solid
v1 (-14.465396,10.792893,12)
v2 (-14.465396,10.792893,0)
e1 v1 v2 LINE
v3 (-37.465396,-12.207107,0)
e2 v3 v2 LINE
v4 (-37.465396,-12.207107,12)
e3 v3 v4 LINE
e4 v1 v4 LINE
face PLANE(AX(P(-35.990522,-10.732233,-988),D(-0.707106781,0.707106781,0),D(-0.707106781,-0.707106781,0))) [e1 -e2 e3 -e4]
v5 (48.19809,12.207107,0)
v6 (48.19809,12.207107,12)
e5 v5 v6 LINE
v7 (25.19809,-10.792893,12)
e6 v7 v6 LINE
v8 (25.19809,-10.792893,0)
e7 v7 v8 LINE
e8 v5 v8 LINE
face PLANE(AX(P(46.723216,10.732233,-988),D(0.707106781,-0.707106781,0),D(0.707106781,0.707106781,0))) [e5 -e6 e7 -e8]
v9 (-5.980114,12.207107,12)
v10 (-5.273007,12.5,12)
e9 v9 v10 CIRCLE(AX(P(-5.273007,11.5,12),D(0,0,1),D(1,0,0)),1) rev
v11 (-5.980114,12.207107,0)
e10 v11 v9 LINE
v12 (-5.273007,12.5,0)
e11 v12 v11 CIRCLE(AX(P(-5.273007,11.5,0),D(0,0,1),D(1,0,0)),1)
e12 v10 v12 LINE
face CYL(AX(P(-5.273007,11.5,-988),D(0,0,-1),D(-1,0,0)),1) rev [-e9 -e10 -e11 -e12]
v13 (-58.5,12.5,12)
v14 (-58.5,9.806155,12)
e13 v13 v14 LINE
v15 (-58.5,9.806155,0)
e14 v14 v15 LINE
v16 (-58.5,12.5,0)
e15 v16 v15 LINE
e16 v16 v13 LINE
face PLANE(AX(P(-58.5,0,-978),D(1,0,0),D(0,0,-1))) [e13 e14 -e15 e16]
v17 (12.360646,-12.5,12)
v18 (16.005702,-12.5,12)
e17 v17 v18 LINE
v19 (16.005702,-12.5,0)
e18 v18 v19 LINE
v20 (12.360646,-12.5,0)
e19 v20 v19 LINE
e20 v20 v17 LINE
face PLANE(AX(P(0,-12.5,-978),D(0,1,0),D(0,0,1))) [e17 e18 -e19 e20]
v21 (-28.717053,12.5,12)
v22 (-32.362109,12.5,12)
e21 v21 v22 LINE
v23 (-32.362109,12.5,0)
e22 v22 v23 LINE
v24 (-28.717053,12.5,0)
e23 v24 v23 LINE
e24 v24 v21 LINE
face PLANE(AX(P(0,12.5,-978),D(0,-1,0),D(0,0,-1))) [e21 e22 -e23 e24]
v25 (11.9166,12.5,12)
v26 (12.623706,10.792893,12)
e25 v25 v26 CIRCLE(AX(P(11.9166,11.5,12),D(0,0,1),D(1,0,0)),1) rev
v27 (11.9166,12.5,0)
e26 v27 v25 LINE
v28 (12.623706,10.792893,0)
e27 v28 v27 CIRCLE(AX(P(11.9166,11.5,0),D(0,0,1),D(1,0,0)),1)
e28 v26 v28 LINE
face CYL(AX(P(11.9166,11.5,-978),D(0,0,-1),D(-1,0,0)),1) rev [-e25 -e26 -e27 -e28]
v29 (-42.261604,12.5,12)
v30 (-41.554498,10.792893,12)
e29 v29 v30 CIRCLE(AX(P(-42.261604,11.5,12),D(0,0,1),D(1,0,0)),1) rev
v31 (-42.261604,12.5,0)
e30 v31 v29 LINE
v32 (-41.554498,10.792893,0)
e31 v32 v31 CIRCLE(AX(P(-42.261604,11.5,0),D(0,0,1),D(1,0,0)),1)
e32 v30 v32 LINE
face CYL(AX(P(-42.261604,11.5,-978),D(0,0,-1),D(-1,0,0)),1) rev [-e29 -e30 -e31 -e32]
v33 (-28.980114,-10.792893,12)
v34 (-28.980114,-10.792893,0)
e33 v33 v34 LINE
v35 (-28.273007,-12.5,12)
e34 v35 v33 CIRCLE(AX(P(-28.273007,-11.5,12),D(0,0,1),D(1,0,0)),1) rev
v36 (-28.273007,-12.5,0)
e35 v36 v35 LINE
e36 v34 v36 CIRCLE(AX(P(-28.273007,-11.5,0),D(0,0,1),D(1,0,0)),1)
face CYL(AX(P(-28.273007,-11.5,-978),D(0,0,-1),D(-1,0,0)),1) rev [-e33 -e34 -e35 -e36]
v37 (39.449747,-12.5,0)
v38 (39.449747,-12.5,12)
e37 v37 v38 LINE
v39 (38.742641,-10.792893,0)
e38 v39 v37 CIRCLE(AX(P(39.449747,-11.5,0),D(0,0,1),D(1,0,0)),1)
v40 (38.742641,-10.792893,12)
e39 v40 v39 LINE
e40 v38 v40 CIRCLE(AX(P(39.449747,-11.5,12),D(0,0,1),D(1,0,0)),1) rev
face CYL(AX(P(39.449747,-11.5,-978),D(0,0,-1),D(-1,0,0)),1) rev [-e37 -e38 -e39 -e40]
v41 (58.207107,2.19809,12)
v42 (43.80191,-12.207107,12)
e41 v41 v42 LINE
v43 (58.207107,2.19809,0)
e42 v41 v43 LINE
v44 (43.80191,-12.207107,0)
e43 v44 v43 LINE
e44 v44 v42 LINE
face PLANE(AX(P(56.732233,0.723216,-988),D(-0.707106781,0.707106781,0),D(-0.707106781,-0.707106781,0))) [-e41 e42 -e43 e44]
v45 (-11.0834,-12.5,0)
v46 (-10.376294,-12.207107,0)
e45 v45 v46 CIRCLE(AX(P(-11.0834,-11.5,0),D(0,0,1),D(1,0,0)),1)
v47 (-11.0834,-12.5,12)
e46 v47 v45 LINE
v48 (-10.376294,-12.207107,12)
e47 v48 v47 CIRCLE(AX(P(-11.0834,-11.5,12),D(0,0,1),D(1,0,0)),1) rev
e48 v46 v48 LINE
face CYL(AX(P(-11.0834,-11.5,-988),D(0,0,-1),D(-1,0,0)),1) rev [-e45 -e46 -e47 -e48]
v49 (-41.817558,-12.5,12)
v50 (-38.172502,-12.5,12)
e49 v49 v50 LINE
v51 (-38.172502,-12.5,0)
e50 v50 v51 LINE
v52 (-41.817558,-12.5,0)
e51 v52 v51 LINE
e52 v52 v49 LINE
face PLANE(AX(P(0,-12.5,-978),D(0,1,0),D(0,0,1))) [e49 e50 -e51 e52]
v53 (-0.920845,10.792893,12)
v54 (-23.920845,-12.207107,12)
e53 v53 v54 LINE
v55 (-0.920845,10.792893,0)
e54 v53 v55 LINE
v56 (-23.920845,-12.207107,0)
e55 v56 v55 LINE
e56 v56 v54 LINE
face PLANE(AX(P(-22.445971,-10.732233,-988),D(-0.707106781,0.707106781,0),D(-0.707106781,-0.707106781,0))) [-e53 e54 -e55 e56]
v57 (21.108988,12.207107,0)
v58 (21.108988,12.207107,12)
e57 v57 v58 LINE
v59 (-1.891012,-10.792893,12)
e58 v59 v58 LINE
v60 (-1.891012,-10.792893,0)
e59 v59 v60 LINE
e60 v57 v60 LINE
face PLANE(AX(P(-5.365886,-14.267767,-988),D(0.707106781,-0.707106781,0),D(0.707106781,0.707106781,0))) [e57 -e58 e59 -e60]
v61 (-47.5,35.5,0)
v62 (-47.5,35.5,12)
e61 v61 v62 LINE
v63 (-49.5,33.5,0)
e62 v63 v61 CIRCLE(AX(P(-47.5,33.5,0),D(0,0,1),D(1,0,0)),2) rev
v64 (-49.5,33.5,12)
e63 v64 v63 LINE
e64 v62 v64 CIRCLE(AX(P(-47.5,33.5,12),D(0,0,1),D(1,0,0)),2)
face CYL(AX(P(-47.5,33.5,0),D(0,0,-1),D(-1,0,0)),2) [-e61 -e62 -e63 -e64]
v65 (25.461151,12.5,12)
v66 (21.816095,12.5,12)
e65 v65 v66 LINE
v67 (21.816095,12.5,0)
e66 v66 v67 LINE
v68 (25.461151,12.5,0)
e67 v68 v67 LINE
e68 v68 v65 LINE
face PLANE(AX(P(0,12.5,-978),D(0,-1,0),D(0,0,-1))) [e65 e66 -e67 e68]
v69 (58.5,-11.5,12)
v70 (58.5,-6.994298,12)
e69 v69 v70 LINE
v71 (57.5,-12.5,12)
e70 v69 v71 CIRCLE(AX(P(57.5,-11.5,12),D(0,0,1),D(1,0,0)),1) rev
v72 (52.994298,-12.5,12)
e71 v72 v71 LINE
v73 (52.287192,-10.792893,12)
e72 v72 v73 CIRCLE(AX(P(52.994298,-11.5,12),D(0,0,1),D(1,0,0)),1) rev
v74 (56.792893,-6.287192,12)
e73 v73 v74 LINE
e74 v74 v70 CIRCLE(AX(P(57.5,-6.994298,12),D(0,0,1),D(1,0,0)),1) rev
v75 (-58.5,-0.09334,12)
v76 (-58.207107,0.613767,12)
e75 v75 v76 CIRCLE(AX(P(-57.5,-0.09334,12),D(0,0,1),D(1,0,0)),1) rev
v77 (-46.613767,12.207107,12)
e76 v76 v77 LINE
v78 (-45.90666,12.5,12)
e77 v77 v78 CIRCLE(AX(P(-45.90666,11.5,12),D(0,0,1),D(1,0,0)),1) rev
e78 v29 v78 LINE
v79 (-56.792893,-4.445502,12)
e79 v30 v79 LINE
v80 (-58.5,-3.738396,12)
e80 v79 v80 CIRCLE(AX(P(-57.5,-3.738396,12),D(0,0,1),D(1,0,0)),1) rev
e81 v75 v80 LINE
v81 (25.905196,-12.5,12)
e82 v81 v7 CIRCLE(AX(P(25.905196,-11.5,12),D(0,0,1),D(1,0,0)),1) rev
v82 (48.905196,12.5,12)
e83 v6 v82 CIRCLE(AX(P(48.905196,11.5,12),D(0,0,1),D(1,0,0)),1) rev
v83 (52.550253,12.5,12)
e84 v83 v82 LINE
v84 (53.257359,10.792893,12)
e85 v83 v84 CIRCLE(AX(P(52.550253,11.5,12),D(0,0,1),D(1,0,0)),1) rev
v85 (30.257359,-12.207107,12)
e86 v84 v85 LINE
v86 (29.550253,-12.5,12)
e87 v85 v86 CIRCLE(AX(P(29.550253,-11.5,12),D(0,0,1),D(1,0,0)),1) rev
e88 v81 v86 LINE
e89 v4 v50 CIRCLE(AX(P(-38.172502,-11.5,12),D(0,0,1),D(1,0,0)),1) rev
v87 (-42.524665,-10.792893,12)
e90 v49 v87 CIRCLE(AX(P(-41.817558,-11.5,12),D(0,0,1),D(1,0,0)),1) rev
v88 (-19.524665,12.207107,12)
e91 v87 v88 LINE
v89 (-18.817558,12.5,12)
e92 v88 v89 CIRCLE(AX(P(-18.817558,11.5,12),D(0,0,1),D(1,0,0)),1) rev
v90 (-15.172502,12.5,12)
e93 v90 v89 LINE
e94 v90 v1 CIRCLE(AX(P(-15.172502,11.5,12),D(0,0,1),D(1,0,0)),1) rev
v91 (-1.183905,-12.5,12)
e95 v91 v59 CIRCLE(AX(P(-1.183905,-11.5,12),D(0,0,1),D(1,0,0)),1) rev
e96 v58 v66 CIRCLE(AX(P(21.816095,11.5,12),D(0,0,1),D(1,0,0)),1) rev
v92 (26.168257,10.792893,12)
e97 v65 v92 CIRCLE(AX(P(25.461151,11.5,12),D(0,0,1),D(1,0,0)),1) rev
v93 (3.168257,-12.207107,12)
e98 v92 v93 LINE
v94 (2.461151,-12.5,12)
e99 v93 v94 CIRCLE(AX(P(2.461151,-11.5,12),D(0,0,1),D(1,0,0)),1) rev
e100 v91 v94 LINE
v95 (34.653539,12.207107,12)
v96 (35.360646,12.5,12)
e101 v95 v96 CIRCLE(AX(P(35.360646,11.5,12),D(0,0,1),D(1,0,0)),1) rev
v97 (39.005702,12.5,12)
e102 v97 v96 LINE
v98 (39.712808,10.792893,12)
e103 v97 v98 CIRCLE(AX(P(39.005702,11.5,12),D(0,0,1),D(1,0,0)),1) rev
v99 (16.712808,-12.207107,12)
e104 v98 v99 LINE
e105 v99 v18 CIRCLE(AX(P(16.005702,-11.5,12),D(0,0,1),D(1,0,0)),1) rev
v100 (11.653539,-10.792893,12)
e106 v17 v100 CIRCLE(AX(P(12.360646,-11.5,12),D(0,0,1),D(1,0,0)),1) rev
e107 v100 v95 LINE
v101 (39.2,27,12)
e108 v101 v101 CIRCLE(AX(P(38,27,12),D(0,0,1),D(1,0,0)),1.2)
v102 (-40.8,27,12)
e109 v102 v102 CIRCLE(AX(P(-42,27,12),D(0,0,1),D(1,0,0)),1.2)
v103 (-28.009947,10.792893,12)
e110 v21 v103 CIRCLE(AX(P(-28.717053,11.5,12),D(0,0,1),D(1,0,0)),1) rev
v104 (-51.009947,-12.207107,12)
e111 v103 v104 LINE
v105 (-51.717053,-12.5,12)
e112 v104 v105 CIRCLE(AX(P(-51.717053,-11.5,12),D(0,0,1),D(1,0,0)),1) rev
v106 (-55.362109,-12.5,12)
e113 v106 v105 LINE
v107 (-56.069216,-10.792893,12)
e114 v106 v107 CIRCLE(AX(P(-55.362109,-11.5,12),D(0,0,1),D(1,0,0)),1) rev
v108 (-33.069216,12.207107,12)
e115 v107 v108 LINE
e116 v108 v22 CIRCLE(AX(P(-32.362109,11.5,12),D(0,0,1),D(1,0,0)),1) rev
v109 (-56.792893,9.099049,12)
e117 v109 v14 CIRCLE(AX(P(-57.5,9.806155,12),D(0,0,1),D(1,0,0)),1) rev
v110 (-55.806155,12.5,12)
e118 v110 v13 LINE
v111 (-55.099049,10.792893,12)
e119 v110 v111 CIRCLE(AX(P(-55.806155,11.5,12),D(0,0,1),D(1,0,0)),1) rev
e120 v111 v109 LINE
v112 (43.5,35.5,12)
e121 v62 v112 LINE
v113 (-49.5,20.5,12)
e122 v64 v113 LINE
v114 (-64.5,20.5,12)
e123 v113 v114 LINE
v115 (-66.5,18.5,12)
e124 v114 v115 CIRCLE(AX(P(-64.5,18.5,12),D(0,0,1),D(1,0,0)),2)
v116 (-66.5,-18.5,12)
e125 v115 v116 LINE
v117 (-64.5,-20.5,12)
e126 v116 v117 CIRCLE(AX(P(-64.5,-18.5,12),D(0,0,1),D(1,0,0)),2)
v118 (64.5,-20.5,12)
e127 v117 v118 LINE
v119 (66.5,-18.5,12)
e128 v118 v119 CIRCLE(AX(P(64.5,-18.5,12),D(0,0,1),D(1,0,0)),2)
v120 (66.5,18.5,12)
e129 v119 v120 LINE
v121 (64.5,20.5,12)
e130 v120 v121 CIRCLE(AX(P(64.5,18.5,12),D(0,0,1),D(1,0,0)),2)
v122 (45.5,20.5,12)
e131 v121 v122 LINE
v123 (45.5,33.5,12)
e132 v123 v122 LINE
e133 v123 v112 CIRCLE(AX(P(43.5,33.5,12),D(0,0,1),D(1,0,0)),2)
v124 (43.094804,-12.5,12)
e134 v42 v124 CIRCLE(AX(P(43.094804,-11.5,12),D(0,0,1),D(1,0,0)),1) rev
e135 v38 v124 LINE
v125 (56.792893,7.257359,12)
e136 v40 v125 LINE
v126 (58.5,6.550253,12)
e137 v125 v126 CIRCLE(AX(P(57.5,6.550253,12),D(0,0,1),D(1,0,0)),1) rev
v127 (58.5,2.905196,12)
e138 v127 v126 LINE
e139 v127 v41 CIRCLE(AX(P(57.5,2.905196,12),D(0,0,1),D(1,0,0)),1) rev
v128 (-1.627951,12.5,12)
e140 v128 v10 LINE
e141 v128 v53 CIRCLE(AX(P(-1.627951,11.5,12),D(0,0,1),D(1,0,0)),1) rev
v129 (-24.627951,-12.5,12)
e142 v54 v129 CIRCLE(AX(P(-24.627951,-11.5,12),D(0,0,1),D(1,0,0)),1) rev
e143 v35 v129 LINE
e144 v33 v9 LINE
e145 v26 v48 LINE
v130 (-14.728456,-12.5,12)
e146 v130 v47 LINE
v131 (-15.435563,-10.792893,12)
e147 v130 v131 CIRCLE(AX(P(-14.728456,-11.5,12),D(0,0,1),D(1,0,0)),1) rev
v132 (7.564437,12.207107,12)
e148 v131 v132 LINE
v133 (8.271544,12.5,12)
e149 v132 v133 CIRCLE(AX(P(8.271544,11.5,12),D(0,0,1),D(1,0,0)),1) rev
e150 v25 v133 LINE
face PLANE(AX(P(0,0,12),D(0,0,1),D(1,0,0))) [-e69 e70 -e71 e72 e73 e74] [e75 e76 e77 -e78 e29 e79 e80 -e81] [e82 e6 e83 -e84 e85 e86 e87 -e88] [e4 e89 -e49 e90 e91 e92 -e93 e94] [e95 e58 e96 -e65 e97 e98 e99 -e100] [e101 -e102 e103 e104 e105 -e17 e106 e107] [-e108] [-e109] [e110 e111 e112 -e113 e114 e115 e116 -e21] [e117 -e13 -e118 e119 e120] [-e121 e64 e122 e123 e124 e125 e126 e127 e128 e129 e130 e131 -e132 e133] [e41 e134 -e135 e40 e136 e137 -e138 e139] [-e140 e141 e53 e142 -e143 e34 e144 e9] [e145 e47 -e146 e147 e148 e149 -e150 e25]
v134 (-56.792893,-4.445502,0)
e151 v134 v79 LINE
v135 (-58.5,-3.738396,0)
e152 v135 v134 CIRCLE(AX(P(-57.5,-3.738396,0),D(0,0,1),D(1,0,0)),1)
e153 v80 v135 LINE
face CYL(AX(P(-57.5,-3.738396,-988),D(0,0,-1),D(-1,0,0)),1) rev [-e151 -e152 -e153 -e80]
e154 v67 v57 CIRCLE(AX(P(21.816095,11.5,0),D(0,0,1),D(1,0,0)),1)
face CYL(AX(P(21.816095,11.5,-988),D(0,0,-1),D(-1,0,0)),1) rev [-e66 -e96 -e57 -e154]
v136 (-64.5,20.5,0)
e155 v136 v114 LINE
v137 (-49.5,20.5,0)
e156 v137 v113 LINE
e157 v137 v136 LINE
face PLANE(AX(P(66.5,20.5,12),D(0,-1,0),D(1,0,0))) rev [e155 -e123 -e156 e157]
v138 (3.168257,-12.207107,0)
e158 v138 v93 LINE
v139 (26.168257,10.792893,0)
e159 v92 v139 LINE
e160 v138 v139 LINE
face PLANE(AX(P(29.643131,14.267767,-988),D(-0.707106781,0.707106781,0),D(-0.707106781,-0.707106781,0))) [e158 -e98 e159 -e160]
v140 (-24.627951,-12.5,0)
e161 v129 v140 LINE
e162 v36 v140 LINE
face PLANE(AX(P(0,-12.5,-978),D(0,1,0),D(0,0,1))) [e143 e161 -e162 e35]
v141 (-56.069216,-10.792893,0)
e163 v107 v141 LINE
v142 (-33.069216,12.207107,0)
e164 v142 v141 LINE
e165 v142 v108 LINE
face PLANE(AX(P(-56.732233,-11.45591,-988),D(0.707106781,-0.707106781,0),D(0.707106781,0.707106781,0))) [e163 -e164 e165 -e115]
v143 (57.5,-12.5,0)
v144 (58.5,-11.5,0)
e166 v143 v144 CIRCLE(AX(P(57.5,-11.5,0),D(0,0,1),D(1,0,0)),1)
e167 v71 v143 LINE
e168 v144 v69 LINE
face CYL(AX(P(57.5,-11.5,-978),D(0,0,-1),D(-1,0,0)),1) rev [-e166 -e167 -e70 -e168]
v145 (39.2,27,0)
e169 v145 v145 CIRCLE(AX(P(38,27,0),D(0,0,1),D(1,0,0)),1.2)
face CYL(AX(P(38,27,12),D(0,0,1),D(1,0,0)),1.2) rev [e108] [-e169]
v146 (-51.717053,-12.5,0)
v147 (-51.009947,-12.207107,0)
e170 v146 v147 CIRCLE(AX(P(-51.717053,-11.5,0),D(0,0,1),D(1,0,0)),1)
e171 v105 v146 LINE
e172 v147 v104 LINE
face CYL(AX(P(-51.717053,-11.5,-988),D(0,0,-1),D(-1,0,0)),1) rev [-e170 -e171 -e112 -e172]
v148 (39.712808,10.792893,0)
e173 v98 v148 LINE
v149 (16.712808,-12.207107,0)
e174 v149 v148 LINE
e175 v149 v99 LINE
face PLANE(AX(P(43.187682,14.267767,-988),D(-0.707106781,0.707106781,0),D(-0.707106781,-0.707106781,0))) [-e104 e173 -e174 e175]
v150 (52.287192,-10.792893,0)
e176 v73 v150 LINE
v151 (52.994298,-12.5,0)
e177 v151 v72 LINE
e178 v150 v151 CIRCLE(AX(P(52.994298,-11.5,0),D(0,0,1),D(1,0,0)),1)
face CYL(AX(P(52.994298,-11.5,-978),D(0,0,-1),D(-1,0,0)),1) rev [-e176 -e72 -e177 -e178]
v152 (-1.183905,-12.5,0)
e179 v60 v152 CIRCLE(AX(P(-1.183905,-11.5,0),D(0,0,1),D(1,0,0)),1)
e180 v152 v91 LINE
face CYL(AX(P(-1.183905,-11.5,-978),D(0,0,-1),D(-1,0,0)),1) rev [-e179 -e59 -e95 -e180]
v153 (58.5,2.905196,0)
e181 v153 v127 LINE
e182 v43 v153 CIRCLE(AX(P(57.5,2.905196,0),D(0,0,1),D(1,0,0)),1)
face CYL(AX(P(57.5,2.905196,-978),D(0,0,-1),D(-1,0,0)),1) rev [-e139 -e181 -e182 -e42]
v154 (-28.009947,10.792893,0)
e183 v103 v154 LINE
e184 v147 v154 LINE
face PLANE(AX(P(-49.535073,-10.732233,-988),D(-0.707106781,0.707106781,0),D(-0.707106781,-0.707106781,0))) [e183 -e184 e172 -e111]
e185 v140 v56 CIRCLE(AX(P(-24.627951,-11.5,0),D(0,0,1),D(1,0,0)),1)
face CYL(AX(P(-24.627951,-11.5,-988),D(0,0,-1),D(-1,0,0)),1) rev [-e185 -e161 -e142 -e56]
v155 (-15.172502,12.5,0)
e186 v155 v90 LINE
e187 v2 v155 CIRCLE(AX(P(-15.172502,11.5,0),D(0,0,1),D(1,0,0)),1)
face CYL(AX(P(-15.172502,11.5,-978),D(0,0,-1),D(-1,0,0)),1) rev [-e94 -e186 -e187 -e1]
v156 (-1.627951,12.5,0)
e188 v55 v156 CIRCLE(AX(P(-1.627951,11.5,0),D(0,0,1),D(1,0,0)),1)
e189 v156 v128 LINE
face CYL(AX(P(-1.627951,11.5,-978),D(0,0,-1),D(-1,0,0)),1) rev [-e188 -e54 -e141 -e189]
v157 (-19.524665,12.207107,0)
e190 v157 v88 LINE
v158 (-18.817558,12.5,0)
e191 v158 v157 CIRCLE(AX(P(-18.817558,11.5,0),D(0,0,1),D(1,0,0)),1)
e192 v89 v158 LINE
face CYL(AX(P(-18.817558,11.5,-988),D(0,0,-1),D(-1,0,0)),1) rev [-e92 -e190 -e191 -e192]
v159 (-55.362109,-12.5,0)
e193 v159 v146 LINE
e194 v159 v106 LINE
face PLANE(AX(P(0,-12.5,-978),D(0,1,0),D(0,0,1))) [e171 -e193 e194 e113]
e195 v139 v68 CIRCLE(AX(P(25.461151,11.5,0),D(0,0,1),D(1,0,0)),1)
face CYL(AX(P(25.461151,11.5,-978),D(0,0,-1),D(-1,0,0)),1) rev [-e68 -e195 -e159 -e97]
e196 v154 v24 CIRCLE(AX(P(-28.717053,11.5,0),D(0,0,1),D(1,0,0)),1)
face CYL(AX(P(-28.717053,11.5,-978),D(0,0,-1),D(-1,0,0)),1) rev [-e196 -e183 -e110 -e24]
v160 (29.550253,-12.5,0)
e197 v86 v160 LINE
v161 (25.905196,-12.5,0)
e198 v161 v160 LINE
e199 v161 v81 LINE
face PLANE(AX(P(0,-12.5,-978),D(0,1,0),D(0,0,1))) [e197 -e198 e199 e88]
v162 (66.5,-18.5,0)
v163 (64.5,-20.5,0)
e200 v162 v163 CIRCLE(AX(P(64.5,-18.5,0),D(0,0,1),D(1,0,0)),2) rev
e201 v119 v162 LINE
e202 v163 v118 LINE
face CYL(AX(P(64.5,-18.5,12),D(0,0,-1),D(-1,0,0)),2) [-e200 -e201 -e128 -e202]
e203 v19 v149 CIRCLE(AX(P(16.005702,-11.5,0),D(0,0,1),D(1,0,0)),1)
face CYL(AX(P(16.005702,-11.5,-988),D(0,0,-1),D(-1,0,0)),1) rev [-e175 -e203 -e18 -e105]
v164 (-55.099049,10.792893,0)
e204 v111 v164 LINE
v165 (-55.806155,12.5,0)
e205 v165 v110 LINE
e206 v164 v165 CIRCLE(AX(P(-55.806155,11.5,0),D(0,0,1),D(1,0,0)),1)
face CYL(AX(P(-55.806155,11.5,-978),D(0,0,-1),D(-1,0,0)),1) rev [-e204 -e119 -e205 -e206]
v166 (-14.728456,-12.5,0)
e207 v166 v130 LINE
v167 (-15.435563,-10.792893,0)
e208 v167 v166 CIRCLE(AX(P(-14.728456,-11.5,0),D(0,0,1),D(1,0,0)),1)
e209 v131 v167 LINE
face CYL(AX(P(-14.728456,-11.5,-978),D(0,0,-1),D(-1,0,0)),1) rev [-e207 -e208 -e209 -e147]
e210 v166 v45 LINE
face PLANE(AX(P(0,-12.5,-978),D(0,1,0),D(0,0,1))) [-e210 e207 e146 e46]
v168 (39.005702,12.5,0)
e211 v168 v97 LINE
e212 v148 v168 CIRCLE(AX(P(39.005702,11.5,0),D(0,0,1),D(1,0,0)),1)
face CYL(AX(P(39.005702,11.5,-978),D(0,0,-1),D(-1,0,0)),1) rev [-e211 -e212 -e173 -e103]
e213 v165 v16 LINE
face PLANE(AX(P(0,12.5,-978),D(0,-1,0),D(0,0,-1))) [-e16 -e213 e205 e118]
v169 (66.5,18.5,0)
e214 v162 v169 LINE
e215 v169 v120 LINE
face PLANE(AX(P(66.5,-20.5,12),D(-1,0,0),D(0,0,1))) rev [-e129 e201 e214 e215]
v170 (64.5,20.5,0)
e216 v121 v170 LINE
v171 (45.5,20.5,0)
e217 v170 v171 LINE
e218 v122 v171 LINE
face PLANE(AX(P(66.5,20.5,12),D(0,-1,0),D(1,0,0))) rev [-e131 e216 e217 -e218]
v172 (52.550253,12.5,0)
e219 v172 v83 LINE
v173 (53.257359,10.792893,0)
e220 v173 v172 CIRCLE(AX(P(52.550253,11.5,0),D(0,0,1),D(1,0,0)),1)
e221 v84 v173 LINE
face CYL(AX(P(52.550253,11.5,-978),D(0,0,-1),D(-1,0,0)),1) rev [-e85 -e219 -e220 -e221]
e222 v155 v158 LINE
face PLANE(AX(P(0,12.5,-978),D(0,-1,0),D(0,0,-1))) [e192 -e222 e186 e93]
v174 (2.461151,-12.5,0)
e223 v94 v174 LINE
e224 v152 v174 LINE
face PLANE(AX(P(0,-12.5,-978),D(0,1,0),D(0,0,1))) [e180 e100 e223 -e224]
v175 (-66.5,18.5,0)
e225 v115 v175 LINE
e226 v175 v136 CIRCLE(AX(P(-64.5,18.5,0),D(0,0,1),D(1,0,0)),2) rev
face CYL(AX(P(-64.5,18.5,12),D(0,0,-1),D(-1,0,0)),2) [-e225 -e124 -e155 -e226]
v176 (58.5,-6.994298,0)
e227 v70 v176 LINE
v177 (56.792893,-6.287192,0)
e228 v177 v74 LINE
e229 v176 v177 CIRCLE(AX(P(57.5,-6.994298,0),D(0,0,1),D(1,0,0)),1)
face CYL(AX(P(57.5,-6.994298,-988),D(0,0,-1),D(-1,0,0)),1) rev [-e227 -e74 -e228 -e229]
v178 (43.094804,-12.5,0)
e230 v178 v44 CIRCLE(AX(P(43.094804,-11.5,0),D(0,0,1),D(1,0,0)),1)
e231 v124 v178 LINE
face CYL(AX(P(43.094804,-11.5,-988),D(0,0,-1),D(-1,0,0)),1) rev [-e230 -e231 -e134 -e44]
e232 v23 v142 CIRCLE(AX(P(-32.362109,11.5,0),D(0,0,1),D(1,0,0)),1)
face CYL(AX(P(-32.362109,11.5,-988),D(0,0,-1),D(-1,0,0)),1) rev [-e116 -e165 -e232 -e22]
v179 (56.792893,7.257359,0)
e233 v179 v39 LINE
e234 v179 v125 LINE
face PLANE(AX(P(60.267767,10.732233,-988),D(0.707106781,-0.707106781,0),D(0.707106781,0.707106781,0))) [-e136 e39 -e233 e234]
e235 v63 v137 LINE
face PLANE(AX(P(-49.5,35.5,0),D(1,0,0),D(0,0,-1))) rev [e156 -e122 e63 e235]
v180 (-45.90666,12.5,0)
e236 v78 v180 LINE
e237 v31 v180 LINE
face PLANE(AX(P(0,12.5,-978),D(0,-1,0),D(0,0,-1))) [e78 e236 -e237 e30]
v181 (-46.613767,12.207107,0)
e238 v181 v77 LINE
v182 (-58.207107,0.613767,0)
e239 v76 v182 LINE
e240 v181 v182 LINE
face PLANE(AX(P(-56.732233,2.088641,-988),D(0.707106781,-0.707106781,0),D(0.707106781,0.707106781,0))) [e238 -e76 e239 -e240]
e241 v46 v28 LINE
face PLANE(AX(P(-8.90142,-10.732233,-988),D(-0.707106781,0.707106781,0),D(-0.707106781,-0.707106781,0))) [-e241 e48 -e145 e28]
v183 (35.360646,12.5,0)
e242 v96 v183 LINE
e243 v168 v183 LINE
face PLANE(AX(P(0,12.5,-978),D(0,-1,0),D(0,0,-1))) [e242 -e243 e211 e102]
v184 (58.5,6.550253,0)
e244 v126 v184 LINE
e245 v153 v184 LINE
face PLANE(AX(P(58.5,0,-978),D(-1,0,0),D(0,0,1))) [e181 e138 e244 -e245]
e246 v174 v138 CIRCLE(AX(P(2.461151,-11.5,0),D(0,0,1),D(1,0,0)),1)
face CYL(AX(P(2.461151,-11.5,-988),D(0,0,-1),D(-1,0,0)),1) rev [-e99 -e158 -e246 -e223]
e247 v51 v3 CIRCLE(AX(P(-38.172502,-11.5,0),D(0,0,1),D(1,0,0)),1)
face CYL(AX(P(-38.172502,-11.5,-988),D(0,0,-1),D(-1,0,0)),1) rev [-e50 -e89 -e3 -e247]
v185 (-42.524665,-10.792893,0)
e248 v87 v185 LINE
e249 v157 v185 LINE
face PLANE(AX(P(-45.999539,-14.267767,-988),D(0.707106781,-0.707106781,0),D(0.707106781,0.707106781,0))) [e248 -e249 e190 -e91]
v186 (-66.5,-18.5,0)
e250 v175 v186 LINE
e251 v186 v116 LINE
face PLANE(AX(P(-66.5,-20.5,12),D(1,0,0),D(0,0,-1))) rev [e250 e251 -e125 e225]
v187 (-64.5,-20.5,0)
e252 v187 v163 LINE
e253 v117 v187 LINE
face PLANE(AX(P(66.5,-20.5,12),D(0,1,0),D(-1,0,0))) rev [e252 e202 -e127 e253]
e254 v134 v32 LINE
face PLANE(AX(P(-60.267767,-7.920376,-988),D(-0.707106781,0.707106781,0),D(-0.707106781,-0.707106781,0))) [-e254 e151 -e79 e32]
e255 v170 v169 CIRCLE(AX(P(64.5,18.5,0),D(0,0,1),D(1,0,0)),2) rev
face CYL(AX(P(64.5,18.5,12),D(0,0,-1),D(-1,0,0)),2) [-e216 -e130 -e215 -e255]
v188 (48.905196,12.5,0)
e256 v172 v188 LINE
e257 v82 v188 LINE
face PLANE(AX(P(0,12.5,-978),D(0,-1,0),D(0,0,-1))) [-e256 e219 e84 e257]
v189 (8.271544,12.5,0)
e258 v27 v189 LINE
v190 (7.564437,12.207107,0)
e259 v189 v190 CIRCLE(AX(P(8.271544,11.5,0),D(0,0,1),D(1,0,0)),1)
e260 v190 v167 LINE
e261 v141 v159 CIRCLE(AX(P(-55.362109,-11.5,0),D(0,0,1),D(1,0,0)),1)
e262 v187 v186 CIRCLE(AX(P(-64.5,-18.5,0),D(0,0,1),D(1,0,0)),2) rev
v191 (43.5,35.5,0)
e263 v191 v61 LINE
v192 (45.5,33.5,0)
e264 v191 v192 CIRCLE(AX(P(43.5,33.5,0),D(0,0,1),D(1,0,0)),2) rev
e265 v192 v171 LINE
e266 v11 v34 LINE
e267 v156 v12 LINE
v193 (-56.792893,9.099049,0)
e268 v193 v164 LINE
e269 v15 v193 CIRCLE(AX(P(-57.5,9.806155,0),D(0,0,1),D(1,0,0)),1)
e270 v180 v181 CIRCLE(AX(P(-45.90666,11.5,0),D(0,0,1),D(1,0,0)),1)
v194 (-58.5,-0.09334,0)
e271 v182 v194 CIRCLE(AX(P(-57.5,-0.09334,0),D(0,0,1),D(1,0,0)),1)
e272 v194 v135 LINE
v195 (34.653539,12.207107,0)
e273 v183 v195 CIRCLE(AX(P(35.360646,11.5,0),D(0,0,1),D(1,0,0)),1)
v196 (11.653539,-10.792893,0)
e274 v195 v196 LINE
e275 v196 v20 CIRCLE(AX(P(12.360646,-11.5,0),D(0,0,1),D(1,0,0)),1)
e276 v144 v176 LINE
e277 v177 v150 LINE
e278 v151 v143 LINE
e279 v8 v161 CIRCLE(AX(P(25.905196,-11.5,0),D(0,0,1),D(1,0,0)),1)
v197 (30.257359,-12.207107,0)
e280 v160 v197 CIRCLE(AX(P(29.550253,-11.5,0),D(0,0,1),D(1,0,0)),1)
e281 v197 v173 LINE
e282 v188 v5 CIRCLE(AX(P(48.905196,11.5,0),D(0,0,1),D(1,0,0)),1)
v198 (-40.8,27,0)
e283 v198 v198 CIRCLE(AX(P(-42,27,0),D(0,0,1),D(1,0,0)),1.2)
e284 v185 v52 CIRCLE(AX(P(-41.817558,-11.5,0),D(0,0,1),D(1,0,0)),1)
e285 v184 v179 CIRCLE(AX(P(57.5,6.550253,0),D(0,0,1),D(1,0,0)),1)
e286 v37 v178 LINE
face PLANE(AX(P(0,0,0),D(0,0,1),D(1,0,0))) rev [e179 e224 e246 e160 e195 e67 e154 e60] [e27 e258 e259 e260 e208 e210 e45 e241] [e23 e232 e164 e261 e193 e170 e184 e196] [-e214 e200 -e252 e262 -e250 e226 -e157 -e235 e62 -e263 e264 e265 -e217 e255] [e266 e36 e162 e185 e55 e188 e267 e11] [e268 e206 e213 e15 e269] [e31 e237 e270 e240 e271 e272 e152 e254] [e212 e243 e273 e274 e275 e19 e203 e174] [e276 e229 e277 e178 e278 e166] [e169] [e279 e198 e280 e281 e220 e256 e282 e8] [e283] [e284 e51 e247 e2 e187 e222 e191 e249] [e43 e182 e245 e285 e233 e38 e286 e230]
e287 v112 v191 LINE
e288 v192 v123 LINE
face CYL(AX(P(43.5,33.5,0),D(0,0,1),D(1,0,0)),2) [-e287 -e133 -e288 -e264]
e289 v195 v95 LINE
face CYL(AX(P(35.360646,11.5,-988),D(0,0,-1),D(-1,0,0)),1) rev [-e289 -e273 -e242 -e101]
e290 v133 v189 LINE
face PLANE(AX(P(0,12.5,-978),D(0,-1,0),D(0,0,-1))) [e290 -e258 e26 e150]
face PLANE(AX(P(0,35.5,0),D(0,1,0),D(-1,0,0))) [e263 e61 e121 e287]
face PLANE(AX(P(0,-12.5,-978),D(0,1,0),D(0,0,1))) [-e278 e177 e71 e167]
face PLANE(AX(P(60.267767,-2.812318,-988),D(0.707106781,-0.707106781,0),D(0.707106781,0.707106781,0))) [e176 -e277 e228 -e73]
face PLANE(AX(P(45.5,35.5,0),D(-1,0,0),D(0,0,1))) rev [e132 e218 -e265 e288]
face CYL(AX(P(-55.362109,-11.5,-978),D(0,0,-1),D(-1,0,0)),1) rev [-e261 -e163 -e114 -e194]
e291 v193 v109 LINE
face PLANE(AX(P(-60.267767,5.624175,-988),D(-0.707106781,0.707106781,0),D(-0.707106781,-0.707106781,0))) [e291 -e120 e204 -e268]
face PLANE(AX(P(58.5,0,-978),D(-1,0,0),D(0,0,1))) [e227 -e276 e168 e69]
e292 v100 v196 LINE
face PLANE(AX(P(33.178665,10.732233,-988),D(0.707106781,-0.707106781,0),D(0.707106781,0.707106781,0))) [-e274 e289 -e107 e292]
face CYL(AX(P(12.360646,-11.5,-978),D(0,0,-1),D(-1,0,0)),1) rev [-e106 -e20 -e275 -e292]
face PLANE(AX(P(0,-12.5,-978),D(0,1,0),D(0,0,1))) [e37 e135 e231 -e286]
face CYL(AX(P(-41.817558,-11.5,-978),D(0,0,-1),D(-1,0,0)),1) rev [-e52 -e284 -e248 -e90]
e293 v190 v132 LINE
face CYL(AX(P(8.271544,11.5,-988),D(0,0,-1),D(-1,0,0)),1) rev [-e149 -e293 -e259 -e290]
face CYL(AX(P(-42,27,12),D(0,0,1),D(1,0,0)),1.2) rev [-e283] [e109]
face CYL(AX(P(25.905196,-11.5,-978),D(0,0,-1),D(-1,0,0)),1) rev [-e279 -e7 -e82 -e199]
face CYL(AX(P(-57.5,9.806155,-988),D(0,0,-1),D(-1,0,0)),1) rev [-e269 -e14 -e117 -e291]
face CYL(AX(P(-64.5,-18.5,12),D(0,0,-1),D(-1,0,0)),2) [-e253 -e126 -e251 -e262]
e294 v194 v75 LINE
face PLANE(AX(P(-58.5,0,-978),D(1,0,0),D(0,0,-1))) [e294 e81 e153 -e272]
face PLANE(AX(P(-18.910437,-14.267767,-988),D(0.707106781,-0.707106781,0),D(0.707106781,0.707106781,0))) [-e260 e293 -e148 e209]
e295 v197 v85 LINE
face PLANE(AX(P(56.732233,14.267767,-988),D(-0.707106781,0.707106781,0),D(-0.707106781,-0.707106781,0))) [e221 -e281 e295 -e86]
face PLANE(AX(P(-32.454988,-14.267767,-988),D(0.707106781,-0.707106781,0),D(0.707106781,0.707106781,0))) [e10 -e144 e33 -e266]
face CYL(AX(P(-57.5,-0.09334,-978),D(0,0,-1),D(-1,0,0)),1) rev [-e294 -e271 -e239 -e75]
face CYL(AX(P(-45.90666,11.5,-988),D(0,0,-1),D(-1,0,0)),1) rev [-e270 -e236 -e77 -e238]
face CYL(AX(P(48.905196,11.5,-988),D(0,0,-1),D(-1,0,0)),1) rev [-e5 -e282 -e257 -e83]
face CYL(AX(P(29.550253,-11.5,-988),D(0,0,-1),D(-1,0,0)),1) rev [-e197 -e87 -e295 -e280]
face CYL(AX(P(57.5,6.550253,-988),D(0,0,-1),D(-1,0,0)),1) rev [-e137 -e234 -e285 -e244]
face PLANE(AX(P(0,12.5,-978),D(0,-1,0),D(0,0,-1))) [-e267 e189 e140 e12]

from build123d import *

# Parameters (mm, degrees)
SKETCH1_W            = 133
SKETCH1_H            = 41
BOSS_EXTRUDE1_DEPTH  = 12
SKETCH2_W            = 95
SKETCH2_H            = 12
BOSS_EXTRUDE2_DEPTH  = 15
FILLET1_R            = 2
M2_CLEARANCE_HOLE1_D = 2.4
VENT1_DEPTH          = 12
FILLET2_R            = 1


# Read off the part's stored shape, not the designer's step: Vent1
with BuildPart() as part:
    # Sketch1 → Boss-Extrude1 (new body)
    with BuildSketch(Plane.XY):
        Rectangle(SKETCH1_W, SKETCH1_H)
    extrude(amount=BOSS_EXTRUDE1_DEPTH)

    # Sketch2 → Boss-Extrude2 (add)
    with BuildSketch(Plane(origin=(0, 20.5, 0), x_dir=(1, 0, 0), z_dir=(0, 1, 0))):
        with Locations((-2, -6)):
            Rectangle(SKETCH2_W, SKETCH2_H)
    extrude(amount=BOSS_EXTRUDE2_DEPTH)

    # Fillet1
    fillet1_edges = [part.edges().sort_by_distance(p)[0] for p in [
        (-49.5, 35.5, 6),
        (45.5, 35.5, 6),
        (-66.5, 20.5, 6),
        (66.5, 20.5, 6),
        (66.5, -20.5, 6),
        (-66.5, -20.5, 6),
    ]]
    fillet(fillet1_edges, radius=FILLET1_R)

    # M2 Clearance Hole1 (through all)
    with Locations(Plane(origin=(-42, 27, 12), x_dir=(1, 0, 0), z_dir=(0, 0, 1))):
        with Locations((0, 0), (80, 0)):
            Hole(M2_CLEARANCE_HOLE1_D / 2)

    # Vent1 outline → Vent1 (cut)
    with BuildSketch(Plane.XY):
        Polygon((-39.847390778, 12.5), (-46.320873948, 12.5), (-58.5, 0.320873948), (-58.5, -6.152609222), align=None)
        Polygon((-26.302839797, 12.5), (-32.776322967, 12.5), (-57.776322967, -12.5), (-51.302839797, -12.5), align=None)
        Polygon((-12.758288815, 12.5), (-19.231771985, 12.5), (-44.231771985, -12.5), (-37.758288815, -12.5), align=None)
        Polygon((0.786262167, 12.5), (-5.687221003, 12.5), (-30.687221003, -12.5), (-24.213737833, -12.5), align=None)
        Polygon((14.330813149, 12.5), (7.857329979, 12.5), (-17.142670021, -12.5), (-10.669186851, -12.5), align=None)
        Polygon((27.875364131, 12.5), (21.401880961, 12.5), (-3.598119039, -12.5), (2.875364131, -12.5), align=None)
        Polygon((-53.39194176, 12.5), (-58.5, 12.5), (-58.5, 7.39194176), align=None)
        Polygon((41.419915112, 12.5), (34.946431942, 12.5), (9.946431942, -12.5), (16.419915112, -12.5), align=None)
        Polygon((54.964466094, 12.5), (48.490982924, 12.5), (23.490982924, -12.5), (29.964466094, -12.5), align=None)
        Polygon((37.035533906, -12.5), (43.509017076, -12.5), (58.5, 2.490982924), (58.5, 8.964466094), align=None)
        Polygon((50.580084888, -12.5), (58.5, -12.5), (58.5, -4.580084888), align=None)
    extrude(amount=VENT1_DEPTH, mode=Mode.SUBTRACT)

    # Fillet2
    fillet2_edges = [part.edges().sort_by_distance(p)[0] for p in [
        (50.580084888, -12.5, 6),
        (43.509017076, -12.5, 6),
        (58.5, 2.490982924, 6),
        (58.5, -4.580084888, 6),
        (37.035533906, -12.5, 6),
        (29.964466094, -12.5, 6),
        (54.964466094, 12.5, 6),
        (58.5, 8.964466094, 6),
        (23.490982924, -12.5, 6),
        (16.419915112, -12.5, 6),
        (41.419915112, 12.5, 6),
        (48.490982924, 12.5, 6),
        (9.946431942, -12.5, 6),
        (2.875364131, -12.5, 6),
        (27.875364131, 12.5, 6),
        (34.946431942, 12.5, 6),
        (14.330813149, 12.5, 6),
        (21.401880961, 12.5, 6),
        (-3.598119039, -12.5, 6),
        (-10.669186851, -12.5, 6),
        (0.786262167, 12.5, 6),
        (7.857329979, 12.5, 6),
        (-17.142670021, -12.5, 6),
        (-24.213737833, -12.5, 6),
        (-12.758288815, 12.5, 6),
        (-5.687221003, 12.5, 6),
        (-30.687221003, -12.5, 6),
        (-37.758288815, -12.5, 6),
        (-26.302839797, 12.5, 6),
        (-19.231771985, 12.5, 6),
        (-44.231771985, -12.5, 6),
        (-51.302839797, -12.5, 6),
        (-39.847390778, 12.5, 6),
        (-32.776322967, 12.5, 6),
        (-57.776322967, -12.5, 6),
        (-58.5, -6.152609222, 6),
        (-53.39194176, 12.5, 6),
        (-46.320873948, 12.5, 6),
        (-58.5, 0.320873948, 6),
        (-58.5, 7.39194176, 6),
        (58.5, -12.5, 6),
    ]]
    fillet(fillet2_edges, radius=FILLET2_R)


solid = part.part
